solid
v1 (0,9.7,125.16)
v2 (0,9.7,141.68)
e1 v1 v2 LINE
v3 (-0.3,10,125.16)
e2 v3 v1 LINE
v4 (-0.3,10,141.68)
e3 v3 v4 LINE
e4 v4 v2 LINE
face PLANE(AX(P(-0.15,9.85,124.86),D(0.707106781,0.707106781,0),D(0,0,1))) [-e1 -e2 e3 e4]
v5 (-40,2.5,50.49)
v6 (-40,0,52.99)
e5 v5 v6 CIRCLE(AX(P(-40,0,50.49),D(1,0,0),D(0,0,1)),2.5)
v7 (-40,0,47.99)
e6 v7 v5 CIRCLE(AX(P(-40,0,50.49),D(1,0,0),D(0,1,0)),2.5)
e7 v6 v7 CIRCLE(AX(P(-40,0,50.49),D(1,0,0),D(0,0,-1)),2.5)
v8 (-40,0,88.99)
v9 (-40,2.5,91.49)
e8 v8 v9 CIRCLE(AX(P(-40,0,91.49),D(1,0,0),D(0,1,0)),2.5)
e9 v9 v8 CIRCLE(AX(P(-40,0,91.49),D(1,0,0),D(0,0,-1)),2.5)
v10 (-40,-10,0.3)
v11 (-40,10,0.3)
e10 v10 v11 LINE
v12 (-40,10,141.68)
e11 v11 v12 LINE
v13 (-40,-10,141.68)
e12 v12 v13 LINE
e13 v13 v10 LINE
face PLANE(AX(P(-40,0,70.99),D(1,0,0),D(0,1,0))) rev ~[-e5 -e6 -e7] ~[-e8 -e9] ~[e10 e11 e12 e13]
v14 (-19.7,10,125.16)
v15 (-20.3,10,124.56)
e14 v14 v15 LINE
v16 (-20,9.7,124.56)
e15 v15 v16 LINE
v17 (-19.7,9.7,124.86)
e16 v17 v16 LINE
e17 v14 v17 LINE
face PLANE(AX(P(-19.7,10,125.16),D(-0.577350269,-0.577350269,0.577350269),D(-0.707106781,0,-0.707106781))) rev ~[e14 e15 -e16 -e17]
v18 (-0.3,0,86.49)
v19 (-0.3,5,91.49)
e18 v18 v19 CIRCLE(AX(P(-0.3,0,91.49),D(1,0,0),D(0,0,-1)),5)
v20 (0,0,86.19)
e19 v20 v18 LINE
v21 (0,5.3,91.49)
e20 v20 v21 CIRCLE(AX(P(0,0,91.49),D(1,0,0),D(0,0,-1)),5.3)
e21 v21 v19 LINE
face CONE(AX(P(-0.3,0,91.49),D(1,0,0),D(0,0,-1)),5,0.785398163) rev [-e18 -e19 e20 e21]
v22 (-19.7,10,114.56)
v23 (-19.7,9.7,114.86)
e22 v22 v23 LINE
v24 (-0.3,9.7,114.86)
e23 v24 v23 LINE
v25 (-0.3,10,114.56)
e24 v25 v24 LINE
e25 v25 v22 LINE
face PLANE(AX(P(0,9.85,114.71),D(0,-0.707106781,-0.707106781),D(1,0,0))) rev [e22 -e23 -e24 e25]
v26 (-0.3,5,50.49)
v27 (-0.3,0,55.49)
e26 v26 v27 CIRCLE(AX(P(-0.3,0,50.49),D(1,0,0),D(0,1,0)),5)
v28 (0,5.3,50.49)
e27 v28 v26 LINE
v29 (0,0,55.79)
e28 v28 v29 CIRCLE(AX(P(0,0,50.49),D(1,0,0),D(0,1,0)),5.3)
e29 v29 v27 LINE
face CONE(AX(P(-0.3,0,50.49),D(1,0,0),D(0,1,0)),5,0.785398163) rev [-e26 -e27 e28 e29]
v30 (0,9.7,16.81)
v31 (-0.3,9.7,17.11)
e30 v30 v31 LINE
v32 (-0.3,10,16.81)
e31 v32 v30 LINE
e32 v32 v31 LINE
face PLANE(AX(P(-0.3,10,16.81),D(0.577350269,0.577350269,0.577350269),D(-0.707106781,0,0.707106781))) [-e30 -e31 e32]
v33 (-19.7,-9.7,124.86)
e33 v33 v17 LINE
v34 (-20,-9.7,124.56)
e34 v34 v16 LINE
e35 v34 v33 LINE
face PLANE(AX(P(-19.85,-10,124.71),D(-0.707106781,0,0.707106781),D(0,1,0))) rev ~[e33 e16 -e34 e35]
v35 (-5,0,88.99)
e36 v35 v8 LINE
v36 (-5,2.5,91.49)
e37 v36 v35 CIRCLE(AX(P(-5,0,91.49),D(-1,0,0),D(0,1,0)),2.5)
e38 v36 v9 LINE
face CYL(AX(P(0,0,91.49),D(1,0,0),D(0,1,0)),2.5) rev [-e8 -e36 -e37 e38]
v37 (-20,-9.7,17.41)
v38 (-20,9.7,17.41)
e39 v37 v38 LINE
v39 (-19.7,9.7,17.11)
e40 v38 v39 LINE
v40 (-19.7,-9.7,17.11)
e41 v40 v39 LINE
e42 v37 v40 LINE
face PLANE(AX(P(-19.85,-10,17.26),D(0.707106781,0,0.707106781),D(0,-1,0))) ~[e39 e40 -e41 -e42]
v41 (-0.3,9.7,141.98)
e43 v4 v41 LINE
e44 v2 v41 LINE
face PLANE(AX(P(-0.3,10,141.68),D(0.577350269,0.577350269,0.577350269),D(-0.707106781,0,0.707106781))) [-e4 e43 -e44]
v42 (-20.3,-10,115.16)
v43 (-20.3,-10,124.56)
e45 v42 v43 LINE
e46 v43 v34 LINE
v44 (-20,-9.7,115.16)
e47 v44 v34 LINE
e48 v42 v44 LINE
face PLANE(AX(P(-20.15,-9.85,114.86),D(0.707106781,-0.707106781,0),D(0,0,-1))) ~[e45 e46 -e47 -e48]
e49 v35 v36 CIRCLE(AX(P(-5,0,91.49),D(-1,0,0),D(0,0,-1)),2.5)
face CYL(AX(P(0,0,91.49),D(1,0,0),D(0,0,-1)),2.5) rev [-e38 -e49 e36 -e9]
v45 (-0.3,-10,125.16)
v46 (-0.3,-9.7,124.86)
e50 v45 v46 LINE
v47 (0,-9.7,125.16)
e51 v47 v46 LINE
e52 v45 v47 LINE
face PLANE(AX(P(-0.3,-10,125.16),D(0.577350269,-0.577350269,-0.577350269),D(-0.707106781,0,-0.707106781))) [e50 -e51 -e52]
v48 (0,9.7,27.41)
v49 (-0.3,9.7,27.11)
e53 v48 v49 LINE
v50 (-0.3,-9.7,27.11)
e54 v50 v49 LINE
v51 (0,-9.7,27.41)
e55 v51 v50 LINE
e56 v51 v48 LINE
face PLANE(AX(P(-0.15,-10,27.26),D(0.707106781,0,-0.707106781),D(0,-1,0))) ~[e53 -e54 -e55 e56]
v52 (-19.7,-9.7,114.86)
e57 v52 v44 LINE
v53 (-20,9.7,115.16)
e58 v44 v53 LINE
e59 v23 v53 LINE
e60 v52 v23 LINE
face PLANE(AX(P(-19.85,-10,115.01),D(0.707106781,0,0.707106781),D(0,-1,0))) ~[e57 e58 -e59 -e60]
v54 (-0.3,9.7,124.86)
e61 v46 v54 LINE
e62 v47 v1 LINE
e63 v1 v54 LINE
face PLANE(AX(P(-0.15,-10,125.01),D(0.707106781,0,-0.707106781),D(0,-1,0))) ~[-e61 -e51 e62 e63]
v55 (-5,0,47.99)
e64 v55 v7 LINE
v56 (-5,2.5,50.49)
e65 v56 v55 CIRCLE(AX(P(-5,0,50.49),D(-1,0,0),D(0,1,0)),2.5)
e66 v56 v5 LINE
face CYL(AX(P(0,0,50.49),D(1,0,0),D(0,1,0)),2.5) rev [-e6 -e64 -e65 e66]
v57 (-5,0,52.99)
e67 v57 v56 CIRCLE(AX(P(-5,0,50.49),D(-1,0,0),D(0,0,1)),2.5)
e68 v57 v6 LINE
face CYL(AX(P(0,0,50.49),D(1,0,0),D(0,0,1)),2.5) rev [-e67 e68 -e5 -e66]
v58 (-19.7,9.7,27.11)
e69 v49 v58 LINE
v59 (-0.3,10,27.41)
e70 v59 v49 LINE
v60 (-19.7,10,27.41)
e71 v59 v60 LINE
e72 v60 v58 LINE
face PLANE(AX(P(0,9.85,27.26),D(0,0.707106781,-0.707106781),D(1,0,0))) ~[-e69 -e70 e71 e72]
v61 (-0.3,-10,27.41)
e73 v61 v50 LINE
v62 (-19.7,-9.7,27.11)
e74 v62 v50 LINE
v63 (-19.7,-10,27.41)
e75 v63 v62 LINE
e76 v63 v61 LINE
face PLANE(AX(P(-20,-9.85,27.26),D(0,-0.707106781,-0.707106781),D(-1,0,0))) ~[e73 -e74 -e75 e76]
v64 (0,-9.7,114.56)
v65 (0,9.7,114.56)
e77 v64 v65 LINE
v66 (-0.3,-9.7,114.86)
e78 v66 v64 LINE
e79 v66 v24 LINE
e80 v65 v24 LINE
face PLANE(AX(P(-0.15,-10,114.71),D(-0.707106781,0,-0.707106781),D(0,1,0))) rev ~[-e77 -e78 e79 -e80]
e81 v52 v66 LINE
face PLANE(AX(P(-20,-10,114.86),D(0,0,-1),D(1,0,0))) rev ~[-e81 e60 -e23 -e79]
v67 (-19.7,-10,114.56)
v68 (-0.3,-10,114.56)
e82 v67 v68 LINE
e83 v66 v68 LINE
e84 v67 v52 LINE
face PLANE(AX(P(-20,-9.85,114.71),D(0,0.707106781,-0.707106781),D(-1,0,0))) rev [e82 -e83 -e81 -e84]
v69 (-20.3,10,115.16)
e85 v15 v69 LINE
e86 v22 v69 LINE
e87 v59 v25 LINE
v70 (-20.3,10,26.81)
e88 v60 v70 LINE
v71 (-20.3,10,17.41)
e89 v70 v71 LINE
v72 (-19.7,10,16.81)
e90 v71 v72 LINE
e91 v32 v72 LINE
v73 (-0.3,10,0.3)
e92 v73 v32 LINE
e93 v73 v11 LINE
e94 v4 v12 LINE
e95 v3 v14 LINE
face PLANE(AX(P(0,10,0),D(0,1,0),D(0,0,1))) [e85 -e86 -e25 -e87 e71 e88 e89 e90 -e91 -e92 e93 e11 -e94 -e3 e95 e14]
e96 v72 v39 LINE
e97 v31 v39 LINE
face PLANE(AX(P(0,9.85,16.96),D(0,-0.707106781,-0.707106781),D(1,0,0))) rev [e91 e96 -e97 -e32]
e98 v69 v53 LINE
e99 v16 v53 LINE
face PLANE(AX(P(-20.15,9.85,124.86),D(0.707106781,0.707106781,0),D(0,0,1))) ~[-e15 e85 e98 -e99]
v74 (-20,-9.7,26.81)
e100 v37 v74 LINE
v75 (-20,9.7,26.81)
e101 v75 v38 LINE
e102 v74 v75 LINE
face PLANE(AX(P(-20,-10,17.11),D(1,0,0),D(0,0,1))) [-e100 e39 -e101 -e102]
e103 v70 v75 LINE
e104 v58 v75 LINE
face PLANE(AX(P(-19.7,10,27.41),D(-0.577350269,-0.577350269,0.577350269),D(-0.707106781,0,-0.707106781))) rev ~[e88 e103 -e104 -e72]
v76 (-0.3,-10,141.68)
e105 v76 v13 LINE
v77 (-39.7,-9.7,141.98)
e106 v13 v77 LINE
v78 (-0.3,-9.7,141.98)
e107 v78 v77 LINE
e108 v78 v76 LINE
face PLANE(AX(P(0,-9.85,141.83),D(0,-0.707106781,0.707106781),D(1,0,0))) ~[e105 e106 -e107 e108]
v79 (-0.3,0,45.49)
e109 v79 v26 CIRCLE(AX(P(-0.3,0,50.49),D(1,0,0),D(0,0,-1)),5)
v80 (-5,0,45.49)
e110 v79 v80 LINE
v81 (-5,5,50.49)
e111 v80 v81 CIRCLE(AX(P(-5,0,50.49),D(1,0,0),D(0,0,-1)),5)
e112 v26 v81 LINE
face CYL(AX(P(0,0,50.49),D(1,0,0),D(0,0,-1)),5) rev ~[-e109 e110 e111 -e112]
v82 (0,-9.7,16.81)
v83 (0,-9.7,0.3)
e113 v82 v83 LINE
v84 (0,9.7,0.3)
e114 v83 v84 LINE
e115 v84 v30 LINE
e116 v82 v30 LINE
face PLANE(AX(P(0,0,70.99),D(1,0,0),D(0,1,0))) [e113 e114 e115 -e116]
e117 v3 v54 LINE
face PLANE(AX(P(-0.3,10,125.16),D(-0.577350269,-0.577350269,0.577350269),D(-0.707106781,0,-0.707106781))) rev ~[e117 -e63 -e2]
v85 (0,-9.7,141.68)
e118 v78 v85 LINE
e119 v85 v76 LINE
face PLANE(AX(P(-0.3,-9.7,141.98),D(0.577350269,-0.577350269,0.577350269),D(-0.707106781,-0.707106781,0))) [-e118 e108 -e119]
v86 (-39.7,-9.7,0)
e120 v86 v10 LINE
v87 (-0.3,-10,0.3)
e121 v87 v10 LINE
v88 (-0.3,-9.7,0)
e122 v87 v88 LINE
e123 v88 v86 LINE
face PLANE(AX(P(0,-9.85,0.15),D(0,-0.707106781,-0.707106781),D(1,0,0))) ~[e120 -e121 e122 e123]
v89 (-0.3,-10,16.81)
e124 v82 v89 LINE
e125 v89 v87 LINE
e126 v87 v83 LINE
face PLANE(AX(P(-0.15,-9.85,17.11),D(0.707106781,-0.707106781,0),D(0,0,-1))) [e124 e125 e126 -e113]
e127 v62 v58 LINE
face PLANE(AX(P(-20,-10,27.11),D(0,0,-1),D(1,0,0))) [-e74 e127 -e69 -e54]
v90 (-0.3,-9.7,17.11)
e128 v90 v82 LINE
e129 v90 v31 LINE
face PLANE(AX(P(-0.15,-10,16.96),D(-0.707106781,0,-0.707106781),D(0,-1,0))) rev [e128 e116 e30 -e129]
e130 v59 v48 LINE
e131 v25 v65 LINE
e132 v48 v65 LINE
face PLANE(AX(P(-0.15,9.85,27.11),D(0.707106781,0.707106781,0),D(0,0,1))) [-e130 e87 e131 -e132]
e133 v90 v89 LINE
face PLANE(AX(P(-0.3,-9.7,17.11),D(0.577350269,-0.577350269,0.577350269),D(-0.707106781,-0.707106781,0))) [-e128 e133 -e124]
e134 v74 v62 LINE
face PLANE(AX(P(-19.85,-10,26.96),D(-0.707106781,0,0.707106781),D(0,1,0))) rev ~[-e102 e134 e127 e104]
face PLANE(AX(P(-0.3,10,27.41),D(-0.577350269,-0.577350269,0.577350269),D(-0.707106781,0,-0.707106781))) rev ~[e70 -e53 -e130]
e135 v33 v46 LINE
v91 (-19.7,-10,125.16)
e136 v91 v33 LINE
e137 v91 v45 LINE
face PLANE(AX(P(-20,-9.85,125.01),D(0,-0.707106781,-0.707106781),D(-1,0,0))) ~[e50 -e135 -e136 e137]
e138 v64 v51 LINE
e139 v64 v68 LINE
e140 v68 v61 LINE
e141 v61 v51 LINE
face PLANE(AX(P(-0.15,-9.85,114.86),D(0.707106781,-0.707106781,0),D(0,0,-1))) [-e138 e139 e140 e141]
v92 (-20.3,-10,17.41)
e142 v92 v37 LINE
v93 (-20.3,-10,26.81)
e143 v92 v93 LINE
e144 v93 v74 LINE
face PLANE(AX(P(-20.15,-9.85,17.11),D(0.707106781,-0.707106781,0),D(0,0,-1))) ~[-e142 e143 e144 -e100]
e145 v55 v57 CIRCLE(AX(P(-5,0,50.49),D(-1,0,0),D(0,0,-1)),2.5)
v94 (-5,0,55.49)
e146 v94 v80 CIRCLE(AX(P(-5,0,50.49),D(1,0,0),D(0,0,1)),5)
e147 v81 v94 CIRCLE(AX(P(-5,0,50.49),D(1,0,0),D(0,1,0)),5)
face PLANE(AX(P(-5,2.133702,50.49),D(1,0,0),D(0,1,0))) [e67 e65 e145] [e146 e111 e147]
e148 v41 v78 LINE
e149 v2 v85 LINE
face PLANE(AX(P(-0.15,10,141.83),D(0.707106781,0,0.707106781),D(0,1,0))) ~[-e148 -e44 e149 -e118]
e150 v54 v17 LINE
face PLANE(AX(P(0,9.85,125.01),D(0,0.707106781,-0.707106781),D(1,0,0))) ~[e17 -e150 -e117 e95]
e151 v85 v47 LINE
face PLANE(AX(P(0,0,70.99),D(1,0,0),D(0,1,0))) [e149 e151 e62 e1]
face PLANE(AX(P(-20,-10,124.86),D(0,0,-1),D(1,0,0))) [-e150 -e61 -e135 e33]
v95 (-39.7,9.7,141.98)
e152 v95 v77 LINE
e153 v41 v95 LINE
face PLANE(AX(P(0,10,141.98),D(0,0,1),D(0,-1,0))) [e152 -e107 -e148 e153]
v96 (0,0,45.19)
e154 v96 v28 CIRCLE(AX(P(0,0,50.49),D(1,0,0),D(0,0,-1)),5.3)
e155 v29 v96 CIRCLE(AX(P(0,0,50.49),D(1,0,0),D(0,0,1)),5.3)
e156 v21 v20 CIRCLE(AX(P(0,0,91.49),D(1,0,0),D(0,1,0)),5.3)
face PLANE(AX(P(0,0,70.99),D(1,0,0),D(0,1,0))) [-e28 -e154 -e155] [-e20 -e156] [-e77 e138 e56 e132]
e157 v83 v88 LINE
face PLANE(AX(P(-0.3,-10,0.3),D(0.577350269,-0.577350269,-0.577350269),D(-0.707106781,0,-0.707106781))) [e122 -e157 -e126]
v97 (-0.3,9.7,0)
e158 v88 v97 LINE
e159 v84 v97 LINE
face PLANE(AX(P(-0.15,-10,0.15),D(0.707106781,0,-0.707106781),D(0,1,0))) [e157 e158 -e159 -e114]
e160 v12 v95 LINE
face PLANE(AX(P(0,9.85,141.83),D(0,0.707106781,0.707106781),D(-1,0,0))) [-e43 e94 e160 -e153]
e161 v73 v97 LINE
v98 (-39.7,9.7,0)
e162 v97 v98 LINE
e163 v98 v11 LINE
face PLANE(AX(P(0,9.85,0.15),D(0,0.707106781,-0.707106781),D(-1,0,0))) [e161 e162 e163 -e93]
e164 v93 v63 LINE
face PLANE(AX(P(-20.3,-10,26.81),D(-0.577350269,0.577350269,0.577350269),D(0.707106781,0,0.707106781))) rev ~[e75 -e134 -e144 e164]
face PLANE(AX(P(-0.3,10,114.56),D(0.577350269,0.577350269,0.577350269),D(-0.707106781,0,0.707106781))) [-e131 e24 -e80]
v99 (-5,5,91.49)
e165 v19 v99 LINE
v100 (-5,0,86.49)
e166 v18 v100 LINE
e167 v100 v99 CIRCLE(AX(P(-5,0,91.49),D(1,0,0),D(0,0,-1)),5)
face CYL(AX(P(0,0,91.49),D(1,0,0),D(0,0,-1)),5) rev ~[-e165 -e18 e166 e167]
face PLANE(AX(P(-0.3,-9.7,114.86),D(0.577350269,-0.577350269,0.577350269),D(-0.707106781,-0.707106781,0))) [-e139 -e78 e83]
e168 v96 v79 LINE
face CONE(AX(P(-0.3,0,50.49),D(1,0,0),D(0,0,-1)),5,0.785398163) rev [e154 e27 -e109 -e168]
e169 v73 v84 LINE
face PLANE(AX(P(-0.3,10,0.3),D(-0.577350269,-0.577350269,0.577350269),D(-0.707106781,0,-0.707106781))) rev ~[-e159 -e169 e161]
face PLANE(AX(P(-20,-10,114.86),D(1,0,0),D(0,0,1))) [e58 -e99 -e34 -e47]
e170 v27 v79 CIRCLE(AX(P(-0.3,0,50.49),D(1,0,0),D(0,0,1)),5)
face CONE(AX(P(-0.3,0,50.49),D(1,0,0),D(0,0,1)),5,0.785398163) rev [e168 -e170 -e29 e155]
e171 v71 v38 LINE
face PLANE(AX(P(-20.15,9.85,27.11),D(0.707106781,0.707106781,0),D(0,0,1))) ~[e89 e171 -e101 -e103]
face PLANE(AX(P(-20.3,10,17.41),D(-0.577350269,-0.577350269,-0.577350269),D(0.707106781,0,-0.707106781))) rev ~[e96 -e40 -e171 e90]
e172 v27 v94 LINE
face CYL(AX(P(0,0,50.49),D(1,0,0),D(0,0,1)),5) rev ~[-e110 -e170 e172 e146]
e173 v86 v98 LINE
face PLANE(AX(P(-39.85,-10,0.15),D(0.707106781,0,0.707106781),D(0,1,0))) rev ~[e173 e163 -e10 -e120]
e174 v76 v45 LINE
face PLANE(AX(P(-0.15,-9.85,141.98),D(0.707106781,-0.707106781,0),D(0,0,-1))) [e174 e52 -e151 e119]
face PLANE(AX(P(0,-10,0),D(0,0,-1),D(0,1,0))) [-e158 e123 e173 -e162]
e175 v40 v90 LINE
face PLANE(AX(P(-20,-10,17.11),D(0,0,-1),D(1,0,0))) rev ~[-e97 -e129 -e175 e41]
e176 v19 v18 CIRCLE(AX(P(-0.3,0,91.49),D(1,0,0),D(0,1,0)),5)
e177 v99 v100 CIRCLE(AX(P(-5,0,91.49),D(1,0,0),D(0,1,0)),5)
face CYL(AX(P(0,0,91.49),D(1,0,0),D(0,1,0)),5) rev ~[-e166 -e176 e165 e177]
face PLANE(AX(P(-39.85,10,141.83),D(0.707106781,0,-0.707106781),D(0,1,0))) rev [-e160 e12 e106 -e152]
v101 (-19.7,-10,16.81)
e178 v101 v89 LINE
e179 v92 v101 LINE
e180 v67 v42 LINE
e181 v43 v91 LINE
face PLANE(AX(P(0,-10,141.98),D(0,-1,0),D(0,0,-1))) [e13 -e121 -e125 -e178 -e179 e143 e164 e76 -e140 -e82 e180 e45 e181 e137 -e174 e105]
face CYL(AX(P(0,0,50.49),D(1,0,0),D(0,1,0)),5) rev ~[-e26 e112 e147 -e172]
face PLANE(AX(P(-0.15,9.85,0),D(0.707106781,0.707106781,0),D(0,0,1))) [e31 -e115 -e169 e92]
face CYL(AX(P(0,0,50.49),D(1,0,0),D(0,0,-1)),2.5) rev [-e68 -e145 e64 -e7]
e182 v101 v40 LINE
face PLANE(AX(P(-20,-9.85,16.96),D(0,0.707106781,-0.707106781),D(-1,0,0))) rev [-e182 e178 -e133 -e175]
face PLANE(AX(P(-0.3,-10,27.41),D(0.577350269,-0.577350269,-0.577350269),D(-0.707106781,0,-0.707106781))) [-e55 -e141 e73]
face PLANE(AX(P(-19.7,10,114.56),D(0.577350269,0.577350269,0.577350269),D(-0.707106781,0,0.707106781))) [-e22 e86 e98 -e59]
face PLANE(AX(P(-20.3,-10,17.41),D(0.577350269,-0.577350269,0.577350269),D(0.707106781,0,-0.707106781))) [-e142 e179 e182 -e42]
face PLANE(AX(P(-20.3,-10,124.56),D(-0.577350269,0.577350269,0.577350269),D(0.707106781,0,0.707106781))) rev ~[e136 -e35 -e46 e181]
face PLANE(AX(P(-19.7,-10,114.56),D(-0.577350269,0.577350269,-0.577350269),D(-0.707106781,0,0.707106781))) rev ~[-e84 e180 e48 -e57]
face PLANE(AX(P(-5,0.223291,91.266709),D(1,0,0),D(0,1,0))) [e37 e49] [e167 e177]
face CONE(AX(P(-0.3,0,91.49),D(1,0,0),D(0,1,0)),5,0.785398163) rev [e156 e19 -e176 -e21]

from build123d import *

# Parameters (mm, degrees)
F1_DEPTH = 40
F3_DEPTH = 5
F4_DEPTH = 40.001
F6_W     = 20
F6_H     = 10
F7_DEPTH = 25
F8_SIZE  = 0.3


with BuildPart() as f1:
    # F0 (on Right) → F1 (new body)
    with BuildSketch(Plane.YZ):
        Polygon((-10, 0), (0, 0), (10, 0), (10, 141.98), (-10, 141.98), align=None)
    extrude(amount=-F1_DEPTH)

    # F2 (on Right) → F3 (cut)
    with BuildSketch(Plane.YZ):
        with BuildLine():
            ThreePointArc((5, 91.49), (-3.5355339059, 95.0255339059), (0, 86.49))
            ThreePointArc((0, 86.49), (3.5355339059, 87.9544660941), (5, 91.49))
        make_face()
        with BuildLine():
            ThreePointArc((2.5, 91.49), (1.767766953, 89.722233047), (0, 88.99))
            ThreePointArc((0, 88.99), (-1.767766953, 93.257766953), (2.5, 91.49))
        make_face(mode=Mode.SUBTRACT)
        with BuildLine():
            Line((0, 47.99), (0, 45.49))
            ThreePointArc((0, 45.49), (3.5355339059, 46.9544660941), (5, 50.49))
            ThreePointArc((5, 50.49), (3.5355339059, 54.0255339059), (0, 55.49))
            Line((0, 55.49), (0, 52.99))
            ThreePointArc((0, 52.99), (1.767766953, 52.257766953), (2.5, 50.49))
            ThreePointArc((2.5, 50.49), (1.767766953, 48.722233047), (0, 47.99))
        make_face()
        with BuildLine():
            ThreePointArc((0, 55.49), (-5, 50.49), (0, 45.49))
            Line((0, 45.49), (0, 47.99))
            ThreePointArc((0, 47.99), (-2.5, 50.49), (0, 52.99))
            Line((0, 52.99), (0, 55.49))
        make_face()
    extrude(amount=-F3_DEPTH, mode=Mode.SUBTRACT)

    # F4 (cut, through all): faces of the model
    f4_faces = [f1.faces().sort_by_distance(p)[0] for p in [
        (0, 0, 91.49),
        (0, 0, 50.49),
    ]]
    extrude(f4_faces, amount=-F4_DEPTH, mode=Mode.SUBTRACT)

    # F6 (on offset) → F7 (cut)
    with BuildSketch(Plane.XZ.offset(10)):
        with Locations((-10, 119.86)):
            Rectangle(F6_W, F6_H)
        with Locations((-10, 22.11)):
            Rectangle(F6_W, F6_H)
    extrude(amount=-F7_DEPTH, mode=Mode.SUBTRACT)

    # F8
    f8_edges = [f1.edges().sort_by_distance(p)[0] for p in [
        (0, 0, 0),
        (0, -10, 8.555),
        (0, 0, 17.11),
        (0, 10, 8.555),
        (0, 0, 27.11),
        (0, -10, 70.985),
        (0, 0, 114.86),
        (0, 10, 70.985),
        (0, 0, 45.49),
        (0, -5, 91.49),
        (0, 0, 124.86),
        (0, -10, 133.42),
        (0, 0, 141.98),
        (0, 10, 133.42),
        (-20, -10, 0),
        (-40, 0, 0),
        (-20, 10, 0),
        (-20, 10, 141.98),
        (-20, -10, 141.98),
        (-40, 0, 141.98),
        (-10, -10, 124.86),
        (-20, 0, 124.86),
        (-10, 10, 124.86),
        (-20, 0, 114.86),
        (-10, -10, 114.86),
        (-10, 10, 114.86),
        (-10, -10, 27.11),
        (-20, 0, 27.11),
        (-10, 10, 27.11),
        (-10, -10, 17.11),
        (-10, 10, 17.11),
        (-20, 0, 17.11),
        (-20, -10, 119.86),
        (-20, -10, 22.11),
        (-20, 10, 22.11),
        (-20, 10, 119.86),
    ]]
    chamfer(f8_edges, length=F8_SIZE)


solid = f1.part
